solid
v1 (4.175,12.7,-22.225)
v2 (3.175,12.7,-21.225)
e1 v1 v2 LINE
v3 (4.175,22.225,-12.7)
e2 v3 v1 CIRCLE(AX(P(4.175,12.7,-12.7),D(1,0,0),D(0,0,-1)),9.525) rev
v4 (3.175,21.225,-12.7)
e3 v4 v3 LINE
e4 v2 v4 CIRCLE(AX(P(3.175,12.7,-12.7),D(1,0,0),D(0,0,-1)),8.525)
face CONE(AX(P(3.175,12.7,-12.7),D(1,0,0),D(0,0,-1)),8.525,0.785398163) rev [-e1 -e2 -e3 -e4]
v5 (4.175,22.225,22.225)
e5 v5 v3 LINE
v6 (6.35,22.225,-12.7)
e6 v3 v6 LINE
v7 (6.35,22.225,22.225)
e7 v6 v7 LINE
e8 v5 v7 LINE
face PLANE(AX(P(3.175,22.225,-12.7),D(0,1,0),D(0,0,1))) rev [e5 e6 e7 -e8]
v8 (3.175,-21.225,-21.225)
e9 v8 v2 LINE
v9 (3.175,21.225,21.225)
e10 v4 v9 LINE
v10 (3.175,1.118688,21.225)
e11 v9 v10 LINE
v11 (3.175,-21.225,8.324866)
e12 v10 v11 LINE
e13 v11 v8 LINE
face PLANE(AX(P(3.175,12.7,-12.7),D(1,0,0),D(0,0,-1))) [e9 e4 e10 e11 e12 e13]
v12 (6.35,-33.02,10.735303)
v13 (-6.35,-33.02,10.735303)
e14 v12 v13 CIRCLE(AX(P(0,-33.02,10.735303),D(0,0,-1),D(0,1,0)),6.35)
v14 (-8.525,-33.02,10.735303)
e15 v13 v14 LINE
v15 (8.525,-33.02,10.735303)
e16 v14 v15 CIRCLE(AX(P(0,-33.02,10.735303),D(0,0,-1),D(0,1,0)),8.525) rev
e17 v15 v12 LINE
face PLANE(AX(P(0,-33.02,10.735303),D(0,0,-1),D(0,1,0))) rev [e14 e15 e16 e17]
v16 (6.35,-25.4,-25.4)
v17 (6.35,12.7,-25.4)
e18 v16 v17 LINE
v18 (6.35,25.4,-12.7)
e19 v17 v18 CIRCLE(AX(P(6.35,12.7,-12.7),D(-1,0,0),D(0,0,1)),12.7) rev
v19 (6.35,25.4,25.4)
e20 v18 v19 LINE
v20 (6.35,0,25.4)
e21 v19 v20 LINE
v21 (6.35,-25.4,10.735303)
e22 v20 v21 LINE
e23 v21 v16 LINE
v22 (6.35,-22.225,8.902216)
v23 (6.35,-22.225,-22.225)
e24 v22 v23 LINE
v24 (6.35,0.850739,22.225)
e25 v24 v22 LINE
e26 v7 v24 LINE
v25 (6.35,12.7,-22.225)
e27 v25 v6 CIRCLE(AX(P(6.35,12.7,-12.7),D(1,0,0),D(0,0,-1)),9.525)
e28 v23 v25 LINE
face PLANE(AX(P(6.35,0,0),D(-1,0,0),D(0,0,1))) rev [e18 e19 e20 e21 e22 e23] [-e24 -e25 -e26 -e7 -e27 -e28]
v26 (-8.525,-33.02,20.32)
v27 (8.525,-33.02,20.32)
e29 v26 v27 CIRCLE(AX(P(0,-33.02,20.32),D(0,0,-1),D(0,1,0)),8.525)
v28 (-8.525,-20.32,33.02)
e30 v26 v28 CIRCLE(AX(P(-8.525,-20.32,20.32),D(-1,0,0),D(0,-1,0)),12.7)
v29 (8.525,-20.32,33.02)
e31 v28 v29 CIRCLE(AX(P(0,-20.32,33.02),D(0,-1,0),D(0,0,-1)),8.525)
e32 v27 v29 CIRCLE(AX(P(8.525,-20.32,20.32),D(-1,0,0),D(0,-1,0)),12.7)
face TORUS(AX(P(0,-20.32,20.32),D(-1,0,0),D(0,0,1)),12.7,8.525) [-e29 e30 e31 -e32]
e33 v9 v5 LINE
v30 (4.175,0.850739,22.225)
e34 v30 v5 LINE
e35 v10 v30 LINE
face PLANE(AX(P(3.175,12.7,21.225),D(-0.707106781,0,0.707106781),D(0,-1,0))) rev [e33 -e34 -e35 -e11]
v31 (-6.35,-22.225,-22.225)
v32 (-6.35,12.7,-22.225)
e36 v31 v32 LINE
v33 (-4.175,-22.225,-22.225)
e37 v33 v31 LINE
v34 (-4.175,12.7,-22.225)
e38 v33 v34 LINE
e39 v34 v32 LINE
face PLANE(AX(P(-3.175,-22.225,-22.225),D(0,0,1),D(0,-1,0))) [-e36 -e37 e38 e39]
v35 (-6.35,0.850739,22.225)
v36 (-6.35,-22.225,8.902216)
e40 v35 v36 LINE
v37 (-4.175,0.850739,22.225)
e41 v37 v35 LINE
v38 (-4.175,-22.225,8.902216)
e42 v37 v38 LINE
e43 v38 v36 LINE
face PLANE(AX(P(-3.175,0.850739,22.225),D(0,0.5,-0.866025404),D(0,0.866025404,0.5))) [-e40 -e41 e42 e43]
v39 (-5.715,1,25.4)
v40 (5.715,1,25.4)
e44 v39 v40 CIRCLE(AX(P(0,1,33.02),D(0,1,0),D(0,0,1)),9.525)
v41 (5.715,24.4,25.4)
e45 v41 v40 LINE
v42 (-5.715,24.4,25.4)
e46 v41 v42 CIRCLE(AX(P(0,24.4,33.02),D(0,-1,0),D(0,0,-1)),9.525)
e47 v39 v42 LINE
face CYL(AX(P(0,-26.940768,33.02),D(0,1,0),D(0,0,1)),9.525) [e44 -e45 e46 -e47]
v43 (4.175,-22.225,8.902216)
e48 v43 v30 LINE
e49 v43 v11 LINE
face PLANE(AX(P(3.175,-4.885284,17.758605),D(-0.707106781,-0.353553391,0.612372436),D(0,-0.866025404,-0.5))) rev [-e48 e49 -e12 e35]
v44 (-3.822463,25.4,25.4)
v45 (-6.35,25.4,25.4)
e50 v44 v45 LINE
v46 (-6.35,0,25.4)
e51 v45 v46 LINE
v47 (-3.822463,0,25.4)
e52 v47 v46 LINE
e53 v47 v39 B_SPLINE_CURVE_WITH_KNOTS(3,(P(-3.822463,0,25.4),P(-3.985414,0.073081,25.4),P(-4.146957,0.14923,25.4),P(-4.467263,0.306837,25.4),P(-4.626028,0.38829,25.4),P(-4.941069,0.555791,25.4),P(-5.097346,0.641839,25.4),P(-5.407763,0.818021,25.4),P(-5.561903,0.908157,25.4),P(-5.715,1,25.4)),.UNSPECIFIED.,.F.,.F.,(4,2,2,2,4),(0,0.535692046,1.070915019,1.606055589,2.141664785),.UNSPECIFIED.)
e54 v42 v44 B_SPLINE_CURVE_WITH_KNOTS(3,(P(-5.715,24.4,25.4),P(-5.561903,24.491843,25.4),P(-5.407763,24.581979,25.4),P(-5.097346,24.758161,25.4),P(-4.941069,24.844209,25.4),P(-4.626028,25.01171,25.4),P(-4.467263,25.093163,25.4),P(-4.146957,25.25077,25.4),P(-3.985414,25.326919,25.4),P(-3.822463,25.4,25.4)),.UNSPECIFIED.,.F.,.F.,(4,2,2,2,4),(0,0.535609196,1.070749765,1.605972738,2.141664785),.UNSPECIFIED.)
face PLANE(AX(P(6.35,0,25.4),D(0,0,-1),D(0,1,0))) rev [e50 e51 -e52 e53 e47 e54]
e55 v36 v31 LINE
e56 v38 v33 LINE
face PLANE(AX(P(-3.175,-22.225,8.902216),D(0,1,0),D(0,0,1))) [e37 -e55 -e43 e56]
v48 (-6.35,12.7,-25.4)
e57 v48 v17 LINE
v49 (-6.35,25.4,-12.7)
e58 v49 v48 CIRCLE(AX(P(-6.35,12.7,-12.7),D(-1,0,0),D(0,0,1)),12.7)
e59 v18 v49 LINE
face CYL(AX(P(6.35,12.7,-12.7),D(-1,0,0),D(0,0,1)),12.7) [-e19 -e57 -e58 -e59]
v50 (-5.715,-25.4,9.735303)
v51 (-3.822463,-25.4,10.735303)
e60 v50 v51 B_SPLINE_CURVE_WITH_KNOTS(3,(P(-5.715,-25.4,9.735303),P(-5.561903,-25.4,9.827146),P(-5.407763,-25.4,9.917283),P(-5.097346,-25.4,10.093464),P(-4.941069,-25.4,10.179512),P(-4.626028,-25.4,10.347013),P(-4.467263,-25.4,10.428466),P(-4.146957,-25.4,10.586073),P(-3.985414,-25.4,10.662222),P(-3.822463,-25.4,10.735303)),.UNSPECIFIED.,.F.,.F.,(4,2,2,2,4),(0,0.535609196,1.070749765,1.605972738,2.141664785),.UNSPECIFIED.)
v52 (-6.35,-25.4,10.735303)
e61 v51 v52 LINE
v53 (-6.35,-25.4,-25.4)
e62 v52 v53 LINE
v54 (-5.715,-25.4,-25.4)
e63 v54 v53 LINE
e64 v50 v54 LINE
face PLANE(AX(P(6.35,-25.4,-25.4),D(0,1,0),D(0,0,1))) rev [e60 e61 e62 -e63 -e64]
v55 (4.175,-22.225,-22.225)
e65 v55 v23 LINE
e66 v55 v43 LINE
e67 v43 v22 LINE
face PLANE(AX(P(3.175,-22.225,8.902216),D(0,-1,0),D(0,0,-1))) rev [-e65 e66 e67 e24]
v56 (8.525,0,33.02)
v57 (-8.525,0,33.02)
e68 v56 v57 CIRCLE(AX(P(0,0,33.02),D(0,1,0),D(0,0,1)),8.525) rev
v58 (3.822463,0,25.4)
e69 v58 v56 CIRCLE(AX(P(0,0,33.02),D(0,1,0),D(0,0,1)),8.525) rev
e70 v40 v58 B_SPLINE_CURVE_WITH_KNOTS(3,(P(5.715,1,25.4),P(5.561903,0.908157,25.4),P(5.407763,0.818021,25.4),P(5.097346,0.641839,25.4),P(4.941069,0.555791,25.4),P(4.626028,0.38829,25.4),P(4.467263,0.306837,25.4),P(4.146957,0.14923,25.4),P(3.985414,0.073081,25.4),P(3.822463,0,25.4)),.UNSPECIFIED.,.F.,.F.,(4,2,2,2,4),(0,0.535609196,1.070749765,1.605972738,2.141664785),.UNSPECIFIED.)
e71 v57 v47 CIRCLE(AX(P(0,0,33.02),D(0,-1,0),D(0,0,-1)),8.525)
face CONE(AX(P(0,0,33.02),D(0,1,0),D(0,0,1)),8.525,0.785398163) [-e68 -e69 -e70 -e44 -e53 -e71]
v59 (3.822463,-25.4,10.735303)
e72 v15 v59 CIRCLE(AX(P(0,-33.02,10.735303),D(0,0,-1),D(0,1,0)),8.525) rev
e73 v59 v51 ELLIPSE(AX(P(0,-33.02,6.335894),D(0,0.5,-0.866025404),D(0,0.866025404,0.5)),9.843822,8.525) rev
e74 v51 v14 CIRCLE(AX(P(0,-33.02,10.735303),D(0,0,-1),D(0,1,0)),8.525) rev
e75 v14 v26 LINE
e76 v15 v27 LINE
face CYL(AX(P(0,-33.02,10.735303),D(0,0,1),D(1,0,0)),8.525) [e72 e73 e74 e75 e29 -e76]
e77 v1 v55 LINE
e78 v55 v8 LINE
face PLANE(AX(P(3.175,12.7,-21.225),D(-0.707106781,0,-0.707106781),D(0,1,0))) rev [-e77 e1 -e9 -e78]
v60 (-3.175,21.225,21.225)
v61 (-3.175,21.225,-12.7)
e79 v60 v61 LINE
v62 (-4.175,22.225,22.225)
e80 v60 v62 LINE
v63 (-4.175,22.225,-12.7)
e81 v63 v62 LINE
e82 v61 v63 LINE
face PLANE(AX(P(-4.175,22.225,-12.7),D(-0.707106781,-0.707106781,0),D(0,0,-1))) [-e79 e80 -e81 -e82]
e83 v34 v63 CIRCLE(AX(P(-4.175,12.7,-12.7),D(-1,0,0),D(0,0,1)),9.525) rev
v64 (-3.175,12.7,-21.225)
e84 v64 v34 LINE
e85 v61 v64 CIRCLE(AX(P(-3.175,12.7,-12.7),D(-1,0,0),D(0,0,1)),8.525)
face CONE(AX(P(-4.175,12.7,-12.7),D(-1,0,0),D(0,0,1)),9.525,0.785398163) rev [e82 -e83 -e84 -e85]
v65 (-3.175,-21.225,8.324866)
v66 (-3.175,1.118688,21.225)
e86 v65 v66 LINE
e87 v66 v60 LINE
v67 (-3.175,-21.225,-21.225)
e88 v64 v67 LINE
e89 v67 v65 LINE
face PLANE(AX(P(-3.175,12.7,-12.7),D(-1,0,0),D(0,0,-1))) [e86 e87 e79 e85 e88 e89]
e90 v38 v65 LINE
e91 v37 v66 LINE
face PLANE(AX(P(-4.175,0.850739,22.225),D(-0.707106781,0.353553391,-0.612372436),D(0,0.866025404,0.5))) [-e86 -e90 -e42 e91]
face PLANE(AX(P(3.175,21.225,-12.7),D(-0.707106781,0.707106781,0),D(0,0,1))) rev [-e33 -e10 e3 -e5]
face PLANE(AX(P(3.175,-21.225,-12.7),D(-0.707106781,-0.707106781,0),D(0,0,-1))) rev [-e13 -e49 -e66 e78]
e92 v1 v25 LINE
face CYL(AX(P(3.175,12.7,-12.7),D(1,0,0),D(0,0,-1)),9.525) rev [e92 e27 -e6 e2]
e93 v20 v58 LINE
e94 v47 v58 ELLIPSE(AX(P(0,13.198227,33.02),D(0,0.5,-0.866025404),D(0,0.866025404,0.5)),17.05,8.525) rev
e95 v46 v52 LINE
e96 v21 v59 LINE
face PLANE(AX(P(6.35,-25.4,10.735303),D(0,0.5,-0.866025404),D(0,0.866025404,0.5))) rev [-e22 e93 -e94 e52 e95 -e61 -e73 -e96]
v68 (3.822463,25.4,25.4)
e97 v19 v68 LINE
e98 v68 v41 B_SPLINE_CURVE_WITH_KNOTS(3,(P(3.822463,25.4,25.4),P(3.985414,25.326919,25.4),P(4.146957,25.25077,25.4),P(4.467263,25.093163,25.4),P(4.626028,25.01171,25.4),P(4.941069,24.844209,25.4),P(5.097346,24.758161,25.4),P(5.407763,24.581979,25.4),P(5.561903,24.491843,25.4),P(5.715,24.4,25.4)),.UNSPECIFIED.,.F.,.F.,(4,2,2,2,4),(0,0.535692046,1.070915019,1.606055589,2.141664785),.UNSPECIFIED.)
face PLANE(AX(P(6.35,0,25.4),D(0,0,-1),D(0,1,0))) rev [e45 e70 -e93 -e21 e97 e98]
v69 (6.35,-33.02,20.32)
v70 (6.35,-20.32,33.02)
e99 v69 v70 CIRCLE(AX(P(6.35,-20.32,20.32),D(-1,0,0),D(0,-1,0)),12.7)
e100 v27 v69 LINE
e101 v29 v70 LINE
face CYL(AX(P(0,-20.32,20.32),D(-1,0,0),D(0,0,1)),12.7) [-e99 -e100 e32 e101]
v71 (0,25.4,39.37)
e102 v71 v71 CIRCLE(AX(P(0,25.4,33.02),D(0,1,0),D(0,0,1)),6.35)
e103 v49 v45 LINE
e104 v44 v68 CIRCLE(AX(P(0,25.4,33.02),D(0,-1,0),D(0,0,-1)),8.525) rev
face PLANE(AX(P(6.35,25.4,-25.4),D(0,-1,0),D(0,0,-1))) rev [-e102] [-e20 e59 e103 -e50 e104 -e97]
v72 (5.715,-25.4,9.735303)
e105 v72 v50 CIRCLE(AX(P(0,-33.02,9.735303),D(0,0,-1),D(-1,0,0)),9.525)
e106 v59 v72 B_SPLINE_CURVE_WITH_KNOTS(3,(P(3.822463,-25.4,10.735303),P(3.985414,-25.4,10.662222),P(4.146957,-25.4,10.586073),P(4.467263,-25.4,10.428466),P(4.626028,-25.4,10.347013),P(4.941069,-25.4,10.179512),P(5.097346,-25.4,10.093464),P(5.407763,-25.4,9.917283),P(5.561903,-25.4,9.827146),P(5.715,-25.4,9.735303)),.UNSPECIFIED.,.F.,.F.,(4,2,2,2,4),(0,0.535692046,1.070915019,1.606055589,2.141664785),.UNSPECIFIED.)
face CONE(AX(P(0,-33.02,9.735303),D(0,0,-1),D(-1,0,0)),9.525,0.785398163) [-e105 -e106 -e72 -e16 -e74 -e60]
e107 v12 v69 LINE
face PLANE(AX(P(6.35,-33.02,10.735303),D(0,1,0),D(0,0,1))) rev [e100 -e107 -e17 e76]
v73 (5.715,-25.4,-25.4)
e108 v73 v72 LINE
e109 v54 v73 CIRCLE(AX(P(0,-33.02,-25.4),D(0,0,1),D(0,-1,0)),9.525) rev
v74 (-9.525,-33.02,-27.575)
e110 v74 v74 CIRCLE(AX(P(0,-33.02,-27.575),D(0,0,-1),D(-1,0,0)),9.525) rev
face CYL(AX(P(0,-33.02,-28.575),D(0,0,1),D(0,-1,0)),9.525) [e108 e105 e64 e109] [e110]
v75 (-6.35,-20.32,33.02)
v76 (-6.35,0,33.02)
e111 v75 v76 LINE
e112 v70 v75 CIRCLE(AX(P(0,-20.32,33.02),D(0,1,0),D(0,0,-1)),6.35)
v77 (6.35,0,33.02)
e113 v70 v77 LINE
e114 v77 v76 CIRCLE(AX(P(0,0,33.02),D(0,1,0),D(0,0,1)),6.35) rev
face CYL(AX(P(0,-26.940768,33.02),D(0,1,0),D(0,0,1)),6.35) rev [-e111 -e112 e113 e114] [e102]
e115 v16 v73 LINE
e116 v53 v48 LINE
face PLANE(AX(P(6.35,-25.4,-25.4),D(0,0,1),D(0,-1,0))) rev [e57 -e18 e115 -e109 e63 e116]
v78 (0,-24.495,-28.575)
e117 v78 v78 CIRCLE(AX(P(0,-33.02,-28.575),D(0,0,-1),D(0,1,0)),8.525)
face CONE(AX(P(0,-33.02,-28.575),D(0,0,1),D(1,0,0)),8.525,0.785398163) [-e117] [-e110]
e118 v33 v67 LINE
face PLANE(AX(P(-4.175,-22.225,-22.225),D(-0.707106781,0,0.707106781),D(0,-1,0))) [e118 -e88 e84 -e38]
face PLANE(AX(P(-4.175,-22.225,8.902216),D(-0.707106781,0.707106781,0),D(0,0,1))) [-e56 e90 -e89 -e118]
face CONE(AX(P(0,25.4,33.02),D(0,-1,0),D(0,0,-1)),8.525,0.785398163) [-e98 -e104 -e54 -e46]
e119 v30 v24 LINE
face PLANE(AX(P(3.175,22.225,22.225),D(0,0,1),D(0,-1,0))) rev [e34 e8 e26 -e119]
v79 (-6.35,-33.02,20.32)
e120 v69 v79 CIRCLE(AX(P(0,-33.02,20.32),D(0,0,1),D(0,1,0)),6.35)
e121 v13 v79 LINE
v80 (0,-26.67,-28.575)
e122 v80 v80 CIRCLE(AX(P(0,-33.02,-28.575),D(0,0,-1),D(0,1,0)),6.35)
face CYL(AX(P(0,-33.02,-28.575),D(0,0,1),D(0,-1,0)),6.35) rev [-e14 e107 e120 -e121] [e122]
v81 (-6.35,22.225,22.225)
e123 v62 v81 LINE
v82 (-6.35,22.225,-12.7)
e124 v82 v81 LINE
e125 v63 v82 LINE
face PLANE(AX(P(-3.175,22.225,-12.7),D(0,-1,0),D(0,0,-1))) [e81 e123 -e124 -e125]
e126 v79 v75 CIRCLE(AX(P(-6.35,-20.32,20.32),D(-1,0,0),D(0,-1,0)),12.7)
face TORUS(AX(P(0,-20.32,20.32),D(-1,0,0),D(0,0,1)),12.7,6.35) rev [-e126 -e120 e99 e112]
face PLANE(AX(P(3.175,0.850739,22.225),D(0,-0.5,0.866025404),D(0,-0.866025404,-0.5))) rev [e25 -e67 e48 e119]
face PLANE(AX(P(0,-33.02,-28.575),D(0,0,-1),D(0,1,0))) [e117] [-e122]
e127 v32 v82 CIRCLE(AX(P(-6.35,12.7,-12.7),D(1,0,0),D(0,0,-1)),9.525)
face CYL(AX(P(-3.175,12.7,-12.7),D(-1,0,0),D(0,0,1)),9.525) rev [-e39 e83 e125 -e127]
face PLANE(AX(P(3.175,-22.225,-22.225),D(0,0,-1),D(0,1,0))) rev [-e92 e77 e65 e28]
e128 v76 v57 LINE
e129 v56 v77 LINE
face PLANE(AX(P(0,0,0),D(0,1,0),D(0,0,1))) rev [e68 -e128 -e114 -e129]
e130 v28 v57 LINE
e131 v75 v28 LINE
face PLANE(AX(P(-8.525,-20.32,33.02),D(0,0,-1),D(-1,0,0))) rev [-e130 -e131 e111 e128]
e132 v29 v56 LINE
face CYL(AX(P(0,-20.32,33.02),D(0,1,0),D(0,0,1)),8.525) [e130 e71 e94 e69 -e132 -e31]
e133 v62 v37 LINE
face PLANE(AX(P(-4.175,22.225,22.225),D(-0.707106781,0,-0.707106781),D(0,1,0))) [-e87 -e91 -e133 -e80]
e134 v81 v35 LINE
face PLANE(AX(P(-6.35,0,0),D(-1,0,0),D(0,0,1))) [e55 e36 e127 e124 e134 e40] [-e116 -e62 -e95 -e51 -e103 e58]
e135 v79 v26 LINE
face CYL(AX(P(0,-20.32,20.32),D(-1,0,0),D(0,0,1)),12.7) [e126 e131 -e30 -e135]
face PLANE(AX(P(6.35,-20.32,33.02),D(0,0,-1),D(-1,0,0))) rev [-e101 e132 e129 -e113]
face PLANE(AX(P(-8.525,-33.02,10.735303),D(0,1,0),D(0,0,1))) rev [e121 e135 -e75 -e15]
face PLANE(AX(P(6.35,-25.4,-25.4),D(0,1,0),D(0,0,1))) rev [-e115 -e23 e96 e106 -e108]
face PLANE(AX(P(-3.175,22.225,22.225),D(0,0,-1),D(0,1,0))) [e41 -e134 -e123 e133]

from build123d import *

# Parameters (mm, degrees)
BOSS_EXTRUDE1_DEPTH      = 6.35
FILLET1_R                = 12.7
CUT_EXTRUDE2_DEPTH       = 3.175
BOSS_EXTRUDE2_DEPTH      = 3.175
BOSS_EXTRUDE2_DEPTH_BACK = 36.135303
SKETCH4_R                = 9.525
SKETCH4_R_2              = 6.35
SKETCH5_R                = 9.525
SKETCH5_R_2              = 6.35
BOSS_EXTRUDE3_DEPTH      = 25.4
CHAMFER2_SIZE            = 1
CHAMFER4_SIZE            = 1


with BuildPart() as part:
    # Sketch1 → Boss-Extrude1 (new, symmetric)
    with BuildSketch(Plane.YZ):
        Polygon((-25.4, 10.735303163), (0, 25.4), (25.4, 25.4), (25.4, -25.4), (-25.4, -25.4), align=None)
    extrude(amount=BOSS_EXTRUDE1_DEPTH, both=True)

    # Fillet1
    fillet1_edges = [part.edges().sort_by_distance(p)[0] for p in [
        (0, 25.4, -25.4),
    ]]
    fillet(fillet1_edges, radius=FILLET1_R)

    # Sketch3 → Cut-Extrude2 (cut)
    with BuildSketch(Plane.YZ.offset(6.35)):
        with BuildLine():
            Line((-22.225, -22.225), (12.7, -22.225))
            ThreePointArc((12.7, -22.225), (19.435192091, -19.435192091), (22.225, -12.7))
            Line((22.225, -12.7), (22.225, 22.225))
            Line((22.225, 22.225), (0.850738686, 22.225))
            Line((0.850738686, 22.225), (-22.225, 8.902216058))
            Line((-22.225, 8.902216058), (-22.225, -22.225))
        make_face()
    cut_extrude2 = extrude(amount=-CUT_EXTRUDE2_DEPTH, mode=Mode.SUBTRACT)

    # Mirror1: Cut-Extrude2 across plane
    add(cut_extrude2.mirror(Plane(origin=(0, 0, 0), x_dir=(0, 0, 1), z_dir=(1, 0, 0))), mode=Mode.SUBTRACT)

    # Sketch4 → Boss-Extrude2 (add, two sides: drawn at the far end of the back side and taken through both)
    with BuildSketch(Plane(origin=(0, 0, -25.4), x_dir=(1, 0, 0), z_dir=(0, 0, -1)).offset(-BOSS_EXTRUDE2_DEPTH_BACK)):
        with Locations(Location((0, 33.02, 0), (0, 0, 233.130102354))):
            Circle(SKETCH4_R)
        with Locations(Location((0, 33.02, 0), (0, 0, 270))):
            Circle(SKETCH4_R_2, mode=Mode.SUBTRACT)
    extrude(amount=BOSS_EXTRUDE2_DEPTH + BOSS_EXTRUDE2_DEPTH_BACK)

    # Sketch5 → Boss-Extrude3 (add)
    with BuildSketch(Plane(origin=(0, 25.4, 0), x_dir=(-1, 0, 0), z_dir=(0, 1, 0))):
        with Locations((0, 33.02)):
            Circle(SKETCH5_R)
        with Locations(Location((0, 33.02, 0), (0, 0, 90))):
            Circle(SKETCH5_R_2, mode=Mode.SUBTRACT)
    extrude(amount=-BOSS_EXTRUDE3_DEPTH)

    # Chamfer2
    # the kernel refuses this chamfer: 1 mm, written as the material it takes off along each edge
    with BuildSketch(Plane(origin=(0, -33.02, 10.735303), x_dir=(0.3638595085405839, 0.931453841070294, 0), z_dir=(-0.931453841070294, 0.3638595085405839, 0))) as chamfer2_piece_1_section:
        Polygon((9.525, CHAMFER2_SIZE), (9.525 - CHAMFER2_SIZE, 0), (9.525, 0), align=None)
    chamfer2_piece_1 = revolve(axis=Axis((0, -33.02, 10.735303), (0, 0, -1)), revolution_arc=317.325176487, mode=Mode.PRIVATE)
    chamfer2_piece_1 = split(chamfer2_piece_1, bisect_by=Plane(origin=(5.777045626, -25.4, 10.24862198), z_dir=(0, -1, 0)), keep=Keep.TOP, mode=Mode.PRIVATE)
    add(chamfer2_piece_1, mode=Mode.SUBTRACT)
    with BuildSketch(Plane(origin=(0, -33.02, -28.575), x_dir=(-0.6000000000021781, 0.7999999999983665, 0), z_dir=(-0.7999999999983665, -0.6000000000021781, 0))) as chamfer2_piece_2:
        Polygon((9.525, -CHAMFER2_SIZE), (9.525 - CHAMFER2_SIZE, 0), (9.525, 0), align=None)
    revolve(axis=Axis((0, -33.02, -28.575), (0, 0, -1)), mode=Mode.SUBTRACT)
    with BuildSketch(Plane(origin=(0, 25.4, 33.02), x_dir=(-0.3638595085405501, 0, -0.9314538410703074), z_dir=(0.9314538410703074, 0, -0.3638595085405501))) as chamfer2_piece_3_section:
        Polygon((9.525, -CHAMFER2_SIZE), (9.525 - CHAMFER2_SIZE, 0), (9.525, 0), align=None)
    chamfer2_piece_3 = revolve(axis=Axis((0, 25.4, 33.02), (0, 1, 0)), revolution_arc=317.325176487, mode=Mode.PRIVATE)
    chamfer2_piece_3 = split(chamfer2_piece_3, bisect_by=Plane(origin=(0, 24.920234358, 25.4), z_dir=(0, 0, 1)), keep=Keep.TOP, mode=Mode.PRIVATE)
    add(chamfer2_piece_3, mode=Mode.SUBTRACT)
    with BuildSketch(Plane(origin=(0, 0, 33.02), x_dir=(-0.3638595085405531, 0, -0.9314538410703063), z_dir=(0.9314538410703063, 0, -0.3638595085405531))) as chamfer2_piece_4_section:
        Polygon((9.525, CHAMFER2_SIZE), (9.525 - CHAMFER2_SIZE, 0), (9.525, 0), align=None)
    chamfer2_piece_4 = revolve(axis=Axis((0, 0, 33.02), (0, 1, 0)), revolution_arc=317.325176487, mode=Mode.PRIVATE)
    chamfer2_piece_4 = split(chamfer2_piece_4, bisect_by=Plane(origin=(-5.452412952, 0.490850729, 25.4), z_dir=(0, 0, 1)), keep=Keep.TOP, mode=Mode.PRIVATE)
    add(chamfer2_piece_4, mode=Mode.SUBTRACT)

    # Sweep3: sweep along a path in Sketch6
    with BuildLine(Plane.YZ) as sweep3_path:
        Line((0, 33.02), (-20.32, 33.02))
        ThreePointArc((-20.32, 33.02), (-29.300256121, 29.300256121), (-33.02, 20.32))
        Line((-33.02, 20.32), (-33.02, 10.735303163))
    # Sketch7 → Sweep3 (sweep)
    with BuildSketch(Plane.XZ):
        with BuildLine():
            Line((-8.525, 33.02), (-6.35, 33.02))
            ThreePointArc((-6.35, 33.02), (0, 26.67), (6.35, 33.02))
            Line((6.35, 33.02), (8.525, 33.02))
            ThreePointArc((8.525, 33.02), (0, 24.495), (-8.525, 33.02))
        make_face()
    sweep(path=sweep3_path.line)

    # Chamfer4
    chamfer4_edges = [part.edges().sort_by_distance(p)[0] for p in [
        (3.175, -22.225, -6.661391971),
        (3.175, -10.687130657, 15.563608029),
        (3.175, 11.537869343, 22.225),
        (3.175, 22.225, 4.7625),
        (3.175, 19.435192091, -19.435192091),
        (3.175, -4.7625, -22.225),
        (-3.175, -22.225, -6.661391971),
        (-3.175, -4.7625, -22.225),
        (-3.175, 19.435192091, -19.435192091),
        (-3.175, 22.225, 4.7625),
        (-3.175, 11.537869343, 22.225),
        (-3.175, -10.687130657, 15.563608029),
    ]]
    chamfer(chamfer4_edges, length=CHAMFER4_SIZE)


solid = part.part
